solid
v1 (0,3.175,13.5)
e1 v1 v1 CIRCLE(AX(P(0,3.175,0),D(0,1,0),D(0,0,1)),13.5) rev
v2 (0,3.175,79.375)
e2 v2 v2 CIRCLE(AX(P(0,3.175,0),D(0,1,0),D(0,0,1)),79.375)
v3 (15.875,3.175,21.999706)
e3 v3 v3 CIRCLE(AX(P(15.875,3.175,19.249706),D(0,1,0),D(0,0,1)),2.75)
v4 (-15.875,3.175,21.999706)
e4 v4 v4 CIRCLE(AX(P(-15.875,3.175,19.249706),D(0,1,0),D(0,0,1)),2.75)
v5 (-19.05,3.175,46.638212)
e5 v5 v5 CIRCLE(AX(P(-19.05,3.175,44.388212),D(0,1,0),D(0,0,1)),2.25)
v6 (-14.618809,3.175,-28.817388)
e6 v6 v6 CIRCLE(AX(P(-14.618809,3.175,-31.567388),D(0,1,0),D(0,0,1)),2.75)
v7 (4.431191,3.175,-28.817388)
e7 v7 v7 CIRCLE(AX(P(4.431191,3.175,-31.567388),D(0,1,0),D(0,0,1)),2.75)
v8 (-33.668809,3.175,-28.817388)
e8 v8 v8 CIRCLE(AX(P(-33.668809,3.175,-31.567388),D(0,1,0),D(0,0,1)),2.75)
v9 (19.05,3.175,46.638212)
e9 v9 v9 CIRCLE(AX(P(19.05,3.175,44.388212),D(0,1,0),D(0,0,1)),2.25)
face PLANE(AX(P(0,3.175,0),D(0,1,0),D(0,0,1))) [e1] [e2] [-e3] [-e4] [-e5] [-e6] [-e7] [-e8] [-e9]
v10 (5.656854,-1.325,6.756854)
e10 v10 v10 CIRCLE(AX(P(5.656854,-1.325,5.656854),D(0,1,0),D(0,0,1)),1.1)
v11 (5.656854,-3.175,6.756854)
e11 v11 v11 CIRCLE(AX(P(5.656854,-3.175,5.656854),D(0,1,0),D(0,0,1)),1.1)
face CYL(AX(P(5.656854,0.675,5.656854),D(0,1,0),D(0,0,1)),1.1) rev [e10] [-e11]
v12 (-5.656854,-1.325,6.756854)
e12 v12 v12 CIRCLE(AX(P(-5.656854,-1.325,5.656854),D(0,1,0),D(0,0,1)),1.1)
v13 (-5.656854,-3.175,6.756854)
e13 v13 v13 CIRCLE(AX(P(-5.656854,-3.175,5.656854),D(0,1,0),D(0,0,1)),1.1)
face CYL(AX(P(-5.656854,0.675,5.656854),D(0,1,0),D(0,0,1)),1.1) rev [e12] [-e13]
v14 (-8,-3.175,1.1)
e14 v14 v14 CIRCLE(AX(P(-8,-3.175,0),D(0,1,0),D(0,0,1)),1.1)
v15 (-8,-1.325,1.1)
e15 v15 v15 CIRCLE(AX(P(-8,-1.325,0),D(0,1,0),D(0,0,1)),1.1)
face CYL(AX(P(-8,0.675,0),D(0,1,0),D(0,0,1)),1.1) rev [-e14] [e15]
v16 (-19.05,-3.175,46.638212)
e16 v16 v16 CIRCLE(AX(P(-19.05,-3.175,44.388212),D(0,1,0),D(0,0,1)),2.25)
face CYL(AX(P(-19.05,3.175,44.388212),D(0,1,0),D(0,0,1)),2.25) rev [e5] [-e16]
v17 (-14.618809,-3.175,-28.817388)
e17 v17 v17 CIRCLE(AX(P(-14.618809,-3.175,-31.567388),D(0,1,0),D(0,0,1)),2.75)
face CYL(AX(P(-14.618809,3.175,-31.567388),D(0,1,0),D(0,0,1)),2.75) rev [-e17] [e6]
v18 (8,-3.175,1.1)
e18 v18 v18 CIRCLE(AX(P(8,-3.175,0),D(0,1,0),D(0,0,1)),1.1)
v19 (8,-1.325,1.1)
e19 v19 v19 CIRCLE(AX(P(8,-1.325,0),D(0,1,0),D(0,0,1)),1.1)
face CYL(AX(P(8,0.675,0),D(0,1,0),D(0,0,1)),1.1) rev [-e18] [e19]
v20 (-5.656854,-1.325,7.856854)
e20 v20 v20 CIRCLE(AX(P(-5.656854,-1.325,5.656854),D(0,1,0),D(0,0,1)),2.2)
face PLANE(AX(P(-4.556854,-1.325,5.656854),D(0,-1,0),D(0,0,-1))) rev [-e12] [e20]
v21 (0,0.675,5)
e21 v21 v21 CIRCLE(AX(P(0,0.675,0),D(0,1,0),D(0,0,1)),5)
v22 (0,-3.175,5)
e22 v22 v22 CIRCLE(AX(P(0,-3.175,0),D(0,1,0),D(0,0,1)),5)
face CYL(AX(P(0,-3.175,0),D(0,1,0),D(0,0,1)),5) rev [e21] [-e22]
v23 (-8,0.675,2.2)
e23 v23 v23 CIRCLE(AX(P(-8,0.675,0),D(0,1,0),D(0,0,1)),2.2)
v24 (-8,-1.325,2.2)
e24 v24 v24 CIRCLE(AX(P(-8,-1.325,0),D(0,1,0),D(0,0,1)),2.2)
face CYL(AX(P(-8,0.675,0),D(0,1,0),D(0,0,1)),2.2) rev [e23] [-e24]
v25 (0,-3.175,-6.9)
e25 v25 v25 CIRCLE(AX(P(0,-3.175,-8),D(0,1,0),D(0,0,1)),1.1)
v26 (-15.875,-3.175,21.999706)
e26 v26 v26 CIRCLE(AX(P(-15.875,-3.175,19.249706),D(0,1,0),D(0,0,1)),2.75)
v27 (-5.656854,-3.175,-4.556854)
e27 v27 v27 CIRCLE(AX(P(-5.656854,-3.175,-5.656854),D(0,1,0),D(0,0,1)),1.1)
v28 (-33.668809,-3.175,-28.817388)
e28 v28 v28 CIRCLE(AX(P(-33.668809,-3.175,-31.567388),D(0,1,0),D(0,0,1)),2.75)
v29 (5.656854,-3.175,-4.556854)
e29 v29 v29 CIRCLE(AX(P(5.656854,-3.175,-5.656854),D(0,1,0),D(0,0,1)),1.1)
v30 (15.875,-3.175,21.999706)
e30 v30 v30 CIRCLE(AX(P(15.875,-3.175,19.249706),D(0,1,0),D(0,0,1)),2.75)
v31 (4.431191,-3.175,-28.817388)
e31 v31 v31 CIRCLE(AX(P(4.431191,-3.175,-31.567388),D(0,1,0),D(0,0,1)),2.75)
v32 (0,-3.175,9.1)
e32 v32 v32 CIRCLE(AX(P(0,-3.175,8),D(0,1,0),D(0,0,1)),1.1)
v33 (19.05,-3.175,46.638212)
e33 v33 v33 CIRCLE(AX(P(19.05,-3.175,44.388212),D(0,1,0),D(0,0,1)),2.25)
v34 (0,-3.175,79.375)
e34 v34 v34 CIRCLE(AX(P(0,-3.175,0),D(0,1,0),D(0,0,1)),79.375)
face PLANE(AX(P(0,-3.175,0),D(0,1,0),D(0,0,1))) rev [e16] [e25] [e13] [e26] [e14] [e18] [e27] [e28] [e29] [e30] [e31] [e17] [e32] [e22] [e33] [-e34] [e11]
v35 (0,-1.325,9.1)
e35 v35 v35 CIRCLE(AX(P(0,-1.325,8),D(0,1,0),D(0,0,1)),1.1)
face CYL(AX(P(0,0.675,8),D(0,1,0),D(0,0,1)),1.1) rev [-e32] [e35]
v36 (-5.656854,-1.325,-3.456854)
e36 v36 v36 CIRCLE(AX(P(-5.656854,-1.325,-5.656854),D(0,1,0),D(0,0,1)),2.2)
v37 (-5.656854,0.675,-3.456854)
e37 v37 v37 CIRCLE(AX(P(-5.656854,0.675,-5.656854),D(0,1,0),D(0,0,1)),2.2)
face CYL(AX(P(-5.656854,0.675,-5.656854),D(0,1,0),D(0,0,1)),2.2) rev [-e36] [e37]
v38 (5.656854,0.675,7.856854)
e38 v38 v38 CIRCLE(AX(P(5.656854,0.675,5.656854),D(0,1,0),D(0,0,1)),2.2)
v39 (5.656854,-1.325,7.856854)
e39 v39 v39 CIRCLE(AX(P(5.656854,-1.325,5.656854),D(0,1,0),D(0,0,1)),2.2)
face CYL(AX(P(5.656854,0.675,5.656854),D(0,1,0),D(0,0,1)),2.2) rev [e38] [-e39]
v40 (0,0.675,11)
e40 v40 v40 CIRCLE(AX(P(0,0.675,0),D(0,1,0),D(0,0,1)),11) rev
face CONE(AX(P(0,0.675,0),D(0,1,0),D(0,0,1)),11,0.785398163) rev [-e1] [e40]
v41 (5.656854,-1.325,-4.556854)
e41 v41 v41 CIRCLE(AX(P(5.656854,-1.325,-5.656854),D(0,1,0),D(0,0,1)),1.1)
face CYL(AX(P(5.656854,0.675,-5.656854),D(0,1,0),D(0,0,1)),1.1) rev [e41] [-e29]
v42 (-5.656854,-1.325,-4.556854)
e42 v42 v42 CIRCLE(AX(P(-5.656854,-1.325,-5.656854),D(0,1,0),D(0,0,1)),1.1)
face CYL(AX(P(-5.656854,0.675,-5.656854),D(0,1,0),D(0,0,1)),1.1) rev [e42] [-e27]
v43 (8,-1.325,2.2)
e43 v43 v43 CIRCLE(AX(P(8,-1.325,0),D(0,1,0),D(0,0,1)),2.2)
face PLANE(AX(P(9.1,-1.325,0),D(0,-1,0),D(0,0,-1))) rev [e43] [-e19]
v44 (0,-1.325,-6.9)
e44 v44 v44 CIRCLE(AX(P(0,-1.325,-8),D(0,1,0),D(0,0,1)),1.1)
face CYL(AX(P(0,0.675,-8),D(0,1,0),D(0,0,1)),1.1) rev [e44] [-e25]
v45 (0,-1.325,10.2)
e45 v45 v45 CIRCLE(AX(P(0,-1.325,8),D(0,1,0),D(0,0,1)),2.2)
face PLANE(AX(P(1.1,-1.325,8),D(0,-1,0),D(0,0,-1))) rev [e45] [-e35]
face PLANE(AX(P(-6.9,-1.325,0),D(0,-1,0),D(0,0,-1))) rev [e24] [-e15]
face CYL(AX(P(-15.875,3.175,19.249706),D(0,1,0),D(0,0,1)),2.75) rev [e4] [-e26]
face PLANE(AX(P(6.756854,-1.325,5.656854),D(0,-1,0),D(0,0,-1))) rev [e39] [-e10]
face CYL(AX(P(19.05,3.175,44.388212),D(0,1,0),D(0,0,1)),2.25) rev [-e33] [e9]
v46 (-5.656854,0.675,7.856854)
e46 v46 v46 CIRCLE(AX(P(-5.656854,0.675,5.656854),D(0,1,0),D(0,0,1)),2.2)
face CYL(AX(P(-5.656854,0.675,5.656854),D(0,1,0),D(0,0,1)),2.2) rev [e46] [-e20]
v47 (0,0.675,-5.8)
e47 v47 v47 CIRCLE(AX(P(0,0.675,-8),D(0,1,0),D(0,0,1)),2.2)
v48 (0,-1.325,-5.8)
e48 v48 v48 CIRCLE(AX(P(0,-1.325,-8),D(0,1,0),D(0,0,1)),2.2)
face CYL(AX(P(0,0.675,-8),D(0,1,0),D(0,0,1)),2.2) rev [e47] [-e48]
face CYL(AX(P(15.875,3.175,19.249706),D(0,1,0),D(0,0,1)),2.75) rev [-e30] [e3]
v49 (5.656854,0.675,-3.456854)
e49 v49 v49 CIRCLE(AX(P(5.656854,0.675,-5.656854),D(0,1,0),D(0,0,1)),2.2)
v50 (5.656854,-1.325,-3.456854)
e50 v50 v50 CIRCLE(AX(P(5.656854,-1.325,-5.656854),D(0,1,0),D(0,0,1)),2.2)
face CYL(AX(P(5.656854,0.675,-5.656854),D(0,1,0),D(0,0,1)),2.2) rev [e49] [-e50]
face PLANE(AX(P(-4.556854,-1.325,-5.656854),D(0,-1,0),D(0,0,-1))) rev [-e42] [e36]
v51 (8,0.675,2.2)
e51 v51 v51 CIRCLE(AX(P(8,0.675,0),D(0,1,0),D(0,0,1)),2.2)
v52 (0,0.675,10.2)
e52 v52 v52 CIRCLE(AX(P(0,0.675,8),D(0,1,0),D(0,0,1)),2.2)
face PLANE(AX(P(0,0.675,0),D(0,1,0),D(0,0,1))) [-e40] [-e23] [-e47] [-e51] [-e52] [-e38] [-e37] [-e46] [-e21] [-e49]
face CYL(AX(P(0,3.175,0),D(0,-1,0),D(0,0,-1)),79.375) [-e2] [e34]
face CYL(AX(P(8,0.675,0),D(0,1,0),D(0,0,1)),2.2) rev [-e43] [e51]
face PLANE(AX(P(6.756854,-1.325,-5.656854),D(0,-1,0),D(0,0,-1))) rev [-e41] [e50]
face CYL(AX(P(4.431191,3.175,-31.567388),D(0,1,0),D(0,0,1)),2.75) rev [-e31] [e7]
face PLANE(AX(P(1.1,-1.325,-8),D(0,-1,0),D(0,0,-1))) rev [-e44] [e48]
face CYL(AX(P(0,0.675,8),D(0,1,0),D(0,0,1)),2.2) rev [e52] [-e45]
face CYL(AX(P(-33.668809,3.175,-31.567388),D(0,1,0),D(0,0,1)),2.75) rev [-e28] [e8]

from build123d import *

# Parameters (mm, degrees)
SKETCH1_R                      = 79.375
BOSS_EXTRUDE1_DEPTH            = 3.175
SKETCH5_R                      = 11
CUT_EXTRUDE1_DEPTH             = 2.5
SKETCH6_R                      = 5
CUT_EXTRUDE2_DEPTH             = 113.432663181
CBORE_FOR_M2_SHCS1_D           = 2.2
CBORE_FOR_M2_SHCS1_DEPTH       = 6
CBORE_FOR_M2_SHCS1_CBORE_D     = 4.4
CBORE_FOR_M2_SHCS1_CBORE_DEPTH = 2
CBORE_FOR_M2_SHCS1_TIP         = 0.660946681
M4_CLEARANCE_HOLE1_D           = 4.5
M5_CLEARANCE_HOLE1_D           = 5.5
CHAMFER1_SIZE                  = 2.5


with BuildPart() as part:
    # Sketch1 → Boss-Extrude1 (new, symmetric)
    with BuildSketch(Plane(origin=(0, 0, 0), x_dir=(1, 0, 0), z_dir=(0, 1, 0))):
        with Locations(Location((0, 0, 0), (0, 0, 270))):
            Circle(SKETCH1_R)
    extrude(amount=BOSS_EXTRUDE1_DEPTH, both=True)

    # Sketch5 → Cut-Extrude1 (cut)
    with BuildSketch(Plane(origin=(0, 3.175, 0), x_dir=(1, 0, 0), z_dir=(0, 1, 0))):
        with Locations(Location((0, 0, 0), (0, 0, 270))):
            Circle(SKETCH5_R)
    extrude(amount=-CUT_EXTRUDE1_DEPTH, mode=Mode.SUBTRACT)

    # Sketch6 → Cut-Extrude2 (cut, through all)
    with BuildSketch(Plane(origin=(0, 3.175, 0), x_dir=(1, 0, 0), z_dir=(0, 1, 0))):
        with Locations(Location((0, 0, 0), (0, 0, 270))):
            Circle(SKETCH6_R)
    extrude(amount=-CUT_EXTRUDE2_DEPTH, mode=Mode.SUBTRACT)

    # CBORE for M2 SHCS1
    with Locations(Plane(origin=(0, 0.675, 0), x_dir=(1, 0, 0), z_dir=(0, 1, 0))):
        with Locations((-5.65685425, 5.65685425), (0, 8), (5.65685425, 5.65685425), (8, 0), (5.65685425, -5.65685425), (0, -8), (-5.65685425, -5.65685425), (-8, 0)):
            CounterBoreHole(CBORE_FOR_M2_SHCS1_D / 2, CBORE_FOR_M2_SHCS1_CBORE_D / 2, CBORE_FOR_M2_SHCS1_CBORE_DEPTH, depth=CBORE_FOR_M2_SHCS1_DEPTH)
            with Locations((0, 0, -(CBORE_FOR_M2_SHCS1_DEPTH + CBORE_FOR_M2_SHCS1_TIP / 2))):  # 118° drill point
                Cone(0, CBORE_FOR_M2_SHCS1_D / 2, CBORE_FOR_M2_SHCS1_TIP, mode=Mode.SUBTRACT)

    # M4 Clearance Hole1 (through all)
    with Locations(Plane(origin=(0, 3.175, 0), x_dir=(1, 0, 0), z_dir=(0, 1, 0))):
        with Locations((19.05, -44.388212048), (-19.05, -44.388212048)):
            Hole(M4_CLEARANCE_HOLE1_D / 2)

    # M5 Clearance Hole1 (through all)
    with Locations(Plane(origin=(0, 3.175, 0), x_dir=(1, 0, 0), z_dir=(0, 1, 0))):
        with Locations((-33.6688086, 31.567387952), (-14.6188086, 31.567387952), (4.4311914, 31.567387952), (-15.875, -19.249706448), (15.875, -19.249706448)):
            Hole(M5_CLEARANCE_HOLE1_D / 2)

    # Chamfer1
    chamfer1_edges = [part.edges().sort_by_distance(p)[0] for p in [
        (0, 3.175, -11),
    ]]
    chamfer(chamfer1_edges, length=CHAMFER1_SIZE - 0.0001)  # a hair under: the kernel refuses the full size


solid = part.part
